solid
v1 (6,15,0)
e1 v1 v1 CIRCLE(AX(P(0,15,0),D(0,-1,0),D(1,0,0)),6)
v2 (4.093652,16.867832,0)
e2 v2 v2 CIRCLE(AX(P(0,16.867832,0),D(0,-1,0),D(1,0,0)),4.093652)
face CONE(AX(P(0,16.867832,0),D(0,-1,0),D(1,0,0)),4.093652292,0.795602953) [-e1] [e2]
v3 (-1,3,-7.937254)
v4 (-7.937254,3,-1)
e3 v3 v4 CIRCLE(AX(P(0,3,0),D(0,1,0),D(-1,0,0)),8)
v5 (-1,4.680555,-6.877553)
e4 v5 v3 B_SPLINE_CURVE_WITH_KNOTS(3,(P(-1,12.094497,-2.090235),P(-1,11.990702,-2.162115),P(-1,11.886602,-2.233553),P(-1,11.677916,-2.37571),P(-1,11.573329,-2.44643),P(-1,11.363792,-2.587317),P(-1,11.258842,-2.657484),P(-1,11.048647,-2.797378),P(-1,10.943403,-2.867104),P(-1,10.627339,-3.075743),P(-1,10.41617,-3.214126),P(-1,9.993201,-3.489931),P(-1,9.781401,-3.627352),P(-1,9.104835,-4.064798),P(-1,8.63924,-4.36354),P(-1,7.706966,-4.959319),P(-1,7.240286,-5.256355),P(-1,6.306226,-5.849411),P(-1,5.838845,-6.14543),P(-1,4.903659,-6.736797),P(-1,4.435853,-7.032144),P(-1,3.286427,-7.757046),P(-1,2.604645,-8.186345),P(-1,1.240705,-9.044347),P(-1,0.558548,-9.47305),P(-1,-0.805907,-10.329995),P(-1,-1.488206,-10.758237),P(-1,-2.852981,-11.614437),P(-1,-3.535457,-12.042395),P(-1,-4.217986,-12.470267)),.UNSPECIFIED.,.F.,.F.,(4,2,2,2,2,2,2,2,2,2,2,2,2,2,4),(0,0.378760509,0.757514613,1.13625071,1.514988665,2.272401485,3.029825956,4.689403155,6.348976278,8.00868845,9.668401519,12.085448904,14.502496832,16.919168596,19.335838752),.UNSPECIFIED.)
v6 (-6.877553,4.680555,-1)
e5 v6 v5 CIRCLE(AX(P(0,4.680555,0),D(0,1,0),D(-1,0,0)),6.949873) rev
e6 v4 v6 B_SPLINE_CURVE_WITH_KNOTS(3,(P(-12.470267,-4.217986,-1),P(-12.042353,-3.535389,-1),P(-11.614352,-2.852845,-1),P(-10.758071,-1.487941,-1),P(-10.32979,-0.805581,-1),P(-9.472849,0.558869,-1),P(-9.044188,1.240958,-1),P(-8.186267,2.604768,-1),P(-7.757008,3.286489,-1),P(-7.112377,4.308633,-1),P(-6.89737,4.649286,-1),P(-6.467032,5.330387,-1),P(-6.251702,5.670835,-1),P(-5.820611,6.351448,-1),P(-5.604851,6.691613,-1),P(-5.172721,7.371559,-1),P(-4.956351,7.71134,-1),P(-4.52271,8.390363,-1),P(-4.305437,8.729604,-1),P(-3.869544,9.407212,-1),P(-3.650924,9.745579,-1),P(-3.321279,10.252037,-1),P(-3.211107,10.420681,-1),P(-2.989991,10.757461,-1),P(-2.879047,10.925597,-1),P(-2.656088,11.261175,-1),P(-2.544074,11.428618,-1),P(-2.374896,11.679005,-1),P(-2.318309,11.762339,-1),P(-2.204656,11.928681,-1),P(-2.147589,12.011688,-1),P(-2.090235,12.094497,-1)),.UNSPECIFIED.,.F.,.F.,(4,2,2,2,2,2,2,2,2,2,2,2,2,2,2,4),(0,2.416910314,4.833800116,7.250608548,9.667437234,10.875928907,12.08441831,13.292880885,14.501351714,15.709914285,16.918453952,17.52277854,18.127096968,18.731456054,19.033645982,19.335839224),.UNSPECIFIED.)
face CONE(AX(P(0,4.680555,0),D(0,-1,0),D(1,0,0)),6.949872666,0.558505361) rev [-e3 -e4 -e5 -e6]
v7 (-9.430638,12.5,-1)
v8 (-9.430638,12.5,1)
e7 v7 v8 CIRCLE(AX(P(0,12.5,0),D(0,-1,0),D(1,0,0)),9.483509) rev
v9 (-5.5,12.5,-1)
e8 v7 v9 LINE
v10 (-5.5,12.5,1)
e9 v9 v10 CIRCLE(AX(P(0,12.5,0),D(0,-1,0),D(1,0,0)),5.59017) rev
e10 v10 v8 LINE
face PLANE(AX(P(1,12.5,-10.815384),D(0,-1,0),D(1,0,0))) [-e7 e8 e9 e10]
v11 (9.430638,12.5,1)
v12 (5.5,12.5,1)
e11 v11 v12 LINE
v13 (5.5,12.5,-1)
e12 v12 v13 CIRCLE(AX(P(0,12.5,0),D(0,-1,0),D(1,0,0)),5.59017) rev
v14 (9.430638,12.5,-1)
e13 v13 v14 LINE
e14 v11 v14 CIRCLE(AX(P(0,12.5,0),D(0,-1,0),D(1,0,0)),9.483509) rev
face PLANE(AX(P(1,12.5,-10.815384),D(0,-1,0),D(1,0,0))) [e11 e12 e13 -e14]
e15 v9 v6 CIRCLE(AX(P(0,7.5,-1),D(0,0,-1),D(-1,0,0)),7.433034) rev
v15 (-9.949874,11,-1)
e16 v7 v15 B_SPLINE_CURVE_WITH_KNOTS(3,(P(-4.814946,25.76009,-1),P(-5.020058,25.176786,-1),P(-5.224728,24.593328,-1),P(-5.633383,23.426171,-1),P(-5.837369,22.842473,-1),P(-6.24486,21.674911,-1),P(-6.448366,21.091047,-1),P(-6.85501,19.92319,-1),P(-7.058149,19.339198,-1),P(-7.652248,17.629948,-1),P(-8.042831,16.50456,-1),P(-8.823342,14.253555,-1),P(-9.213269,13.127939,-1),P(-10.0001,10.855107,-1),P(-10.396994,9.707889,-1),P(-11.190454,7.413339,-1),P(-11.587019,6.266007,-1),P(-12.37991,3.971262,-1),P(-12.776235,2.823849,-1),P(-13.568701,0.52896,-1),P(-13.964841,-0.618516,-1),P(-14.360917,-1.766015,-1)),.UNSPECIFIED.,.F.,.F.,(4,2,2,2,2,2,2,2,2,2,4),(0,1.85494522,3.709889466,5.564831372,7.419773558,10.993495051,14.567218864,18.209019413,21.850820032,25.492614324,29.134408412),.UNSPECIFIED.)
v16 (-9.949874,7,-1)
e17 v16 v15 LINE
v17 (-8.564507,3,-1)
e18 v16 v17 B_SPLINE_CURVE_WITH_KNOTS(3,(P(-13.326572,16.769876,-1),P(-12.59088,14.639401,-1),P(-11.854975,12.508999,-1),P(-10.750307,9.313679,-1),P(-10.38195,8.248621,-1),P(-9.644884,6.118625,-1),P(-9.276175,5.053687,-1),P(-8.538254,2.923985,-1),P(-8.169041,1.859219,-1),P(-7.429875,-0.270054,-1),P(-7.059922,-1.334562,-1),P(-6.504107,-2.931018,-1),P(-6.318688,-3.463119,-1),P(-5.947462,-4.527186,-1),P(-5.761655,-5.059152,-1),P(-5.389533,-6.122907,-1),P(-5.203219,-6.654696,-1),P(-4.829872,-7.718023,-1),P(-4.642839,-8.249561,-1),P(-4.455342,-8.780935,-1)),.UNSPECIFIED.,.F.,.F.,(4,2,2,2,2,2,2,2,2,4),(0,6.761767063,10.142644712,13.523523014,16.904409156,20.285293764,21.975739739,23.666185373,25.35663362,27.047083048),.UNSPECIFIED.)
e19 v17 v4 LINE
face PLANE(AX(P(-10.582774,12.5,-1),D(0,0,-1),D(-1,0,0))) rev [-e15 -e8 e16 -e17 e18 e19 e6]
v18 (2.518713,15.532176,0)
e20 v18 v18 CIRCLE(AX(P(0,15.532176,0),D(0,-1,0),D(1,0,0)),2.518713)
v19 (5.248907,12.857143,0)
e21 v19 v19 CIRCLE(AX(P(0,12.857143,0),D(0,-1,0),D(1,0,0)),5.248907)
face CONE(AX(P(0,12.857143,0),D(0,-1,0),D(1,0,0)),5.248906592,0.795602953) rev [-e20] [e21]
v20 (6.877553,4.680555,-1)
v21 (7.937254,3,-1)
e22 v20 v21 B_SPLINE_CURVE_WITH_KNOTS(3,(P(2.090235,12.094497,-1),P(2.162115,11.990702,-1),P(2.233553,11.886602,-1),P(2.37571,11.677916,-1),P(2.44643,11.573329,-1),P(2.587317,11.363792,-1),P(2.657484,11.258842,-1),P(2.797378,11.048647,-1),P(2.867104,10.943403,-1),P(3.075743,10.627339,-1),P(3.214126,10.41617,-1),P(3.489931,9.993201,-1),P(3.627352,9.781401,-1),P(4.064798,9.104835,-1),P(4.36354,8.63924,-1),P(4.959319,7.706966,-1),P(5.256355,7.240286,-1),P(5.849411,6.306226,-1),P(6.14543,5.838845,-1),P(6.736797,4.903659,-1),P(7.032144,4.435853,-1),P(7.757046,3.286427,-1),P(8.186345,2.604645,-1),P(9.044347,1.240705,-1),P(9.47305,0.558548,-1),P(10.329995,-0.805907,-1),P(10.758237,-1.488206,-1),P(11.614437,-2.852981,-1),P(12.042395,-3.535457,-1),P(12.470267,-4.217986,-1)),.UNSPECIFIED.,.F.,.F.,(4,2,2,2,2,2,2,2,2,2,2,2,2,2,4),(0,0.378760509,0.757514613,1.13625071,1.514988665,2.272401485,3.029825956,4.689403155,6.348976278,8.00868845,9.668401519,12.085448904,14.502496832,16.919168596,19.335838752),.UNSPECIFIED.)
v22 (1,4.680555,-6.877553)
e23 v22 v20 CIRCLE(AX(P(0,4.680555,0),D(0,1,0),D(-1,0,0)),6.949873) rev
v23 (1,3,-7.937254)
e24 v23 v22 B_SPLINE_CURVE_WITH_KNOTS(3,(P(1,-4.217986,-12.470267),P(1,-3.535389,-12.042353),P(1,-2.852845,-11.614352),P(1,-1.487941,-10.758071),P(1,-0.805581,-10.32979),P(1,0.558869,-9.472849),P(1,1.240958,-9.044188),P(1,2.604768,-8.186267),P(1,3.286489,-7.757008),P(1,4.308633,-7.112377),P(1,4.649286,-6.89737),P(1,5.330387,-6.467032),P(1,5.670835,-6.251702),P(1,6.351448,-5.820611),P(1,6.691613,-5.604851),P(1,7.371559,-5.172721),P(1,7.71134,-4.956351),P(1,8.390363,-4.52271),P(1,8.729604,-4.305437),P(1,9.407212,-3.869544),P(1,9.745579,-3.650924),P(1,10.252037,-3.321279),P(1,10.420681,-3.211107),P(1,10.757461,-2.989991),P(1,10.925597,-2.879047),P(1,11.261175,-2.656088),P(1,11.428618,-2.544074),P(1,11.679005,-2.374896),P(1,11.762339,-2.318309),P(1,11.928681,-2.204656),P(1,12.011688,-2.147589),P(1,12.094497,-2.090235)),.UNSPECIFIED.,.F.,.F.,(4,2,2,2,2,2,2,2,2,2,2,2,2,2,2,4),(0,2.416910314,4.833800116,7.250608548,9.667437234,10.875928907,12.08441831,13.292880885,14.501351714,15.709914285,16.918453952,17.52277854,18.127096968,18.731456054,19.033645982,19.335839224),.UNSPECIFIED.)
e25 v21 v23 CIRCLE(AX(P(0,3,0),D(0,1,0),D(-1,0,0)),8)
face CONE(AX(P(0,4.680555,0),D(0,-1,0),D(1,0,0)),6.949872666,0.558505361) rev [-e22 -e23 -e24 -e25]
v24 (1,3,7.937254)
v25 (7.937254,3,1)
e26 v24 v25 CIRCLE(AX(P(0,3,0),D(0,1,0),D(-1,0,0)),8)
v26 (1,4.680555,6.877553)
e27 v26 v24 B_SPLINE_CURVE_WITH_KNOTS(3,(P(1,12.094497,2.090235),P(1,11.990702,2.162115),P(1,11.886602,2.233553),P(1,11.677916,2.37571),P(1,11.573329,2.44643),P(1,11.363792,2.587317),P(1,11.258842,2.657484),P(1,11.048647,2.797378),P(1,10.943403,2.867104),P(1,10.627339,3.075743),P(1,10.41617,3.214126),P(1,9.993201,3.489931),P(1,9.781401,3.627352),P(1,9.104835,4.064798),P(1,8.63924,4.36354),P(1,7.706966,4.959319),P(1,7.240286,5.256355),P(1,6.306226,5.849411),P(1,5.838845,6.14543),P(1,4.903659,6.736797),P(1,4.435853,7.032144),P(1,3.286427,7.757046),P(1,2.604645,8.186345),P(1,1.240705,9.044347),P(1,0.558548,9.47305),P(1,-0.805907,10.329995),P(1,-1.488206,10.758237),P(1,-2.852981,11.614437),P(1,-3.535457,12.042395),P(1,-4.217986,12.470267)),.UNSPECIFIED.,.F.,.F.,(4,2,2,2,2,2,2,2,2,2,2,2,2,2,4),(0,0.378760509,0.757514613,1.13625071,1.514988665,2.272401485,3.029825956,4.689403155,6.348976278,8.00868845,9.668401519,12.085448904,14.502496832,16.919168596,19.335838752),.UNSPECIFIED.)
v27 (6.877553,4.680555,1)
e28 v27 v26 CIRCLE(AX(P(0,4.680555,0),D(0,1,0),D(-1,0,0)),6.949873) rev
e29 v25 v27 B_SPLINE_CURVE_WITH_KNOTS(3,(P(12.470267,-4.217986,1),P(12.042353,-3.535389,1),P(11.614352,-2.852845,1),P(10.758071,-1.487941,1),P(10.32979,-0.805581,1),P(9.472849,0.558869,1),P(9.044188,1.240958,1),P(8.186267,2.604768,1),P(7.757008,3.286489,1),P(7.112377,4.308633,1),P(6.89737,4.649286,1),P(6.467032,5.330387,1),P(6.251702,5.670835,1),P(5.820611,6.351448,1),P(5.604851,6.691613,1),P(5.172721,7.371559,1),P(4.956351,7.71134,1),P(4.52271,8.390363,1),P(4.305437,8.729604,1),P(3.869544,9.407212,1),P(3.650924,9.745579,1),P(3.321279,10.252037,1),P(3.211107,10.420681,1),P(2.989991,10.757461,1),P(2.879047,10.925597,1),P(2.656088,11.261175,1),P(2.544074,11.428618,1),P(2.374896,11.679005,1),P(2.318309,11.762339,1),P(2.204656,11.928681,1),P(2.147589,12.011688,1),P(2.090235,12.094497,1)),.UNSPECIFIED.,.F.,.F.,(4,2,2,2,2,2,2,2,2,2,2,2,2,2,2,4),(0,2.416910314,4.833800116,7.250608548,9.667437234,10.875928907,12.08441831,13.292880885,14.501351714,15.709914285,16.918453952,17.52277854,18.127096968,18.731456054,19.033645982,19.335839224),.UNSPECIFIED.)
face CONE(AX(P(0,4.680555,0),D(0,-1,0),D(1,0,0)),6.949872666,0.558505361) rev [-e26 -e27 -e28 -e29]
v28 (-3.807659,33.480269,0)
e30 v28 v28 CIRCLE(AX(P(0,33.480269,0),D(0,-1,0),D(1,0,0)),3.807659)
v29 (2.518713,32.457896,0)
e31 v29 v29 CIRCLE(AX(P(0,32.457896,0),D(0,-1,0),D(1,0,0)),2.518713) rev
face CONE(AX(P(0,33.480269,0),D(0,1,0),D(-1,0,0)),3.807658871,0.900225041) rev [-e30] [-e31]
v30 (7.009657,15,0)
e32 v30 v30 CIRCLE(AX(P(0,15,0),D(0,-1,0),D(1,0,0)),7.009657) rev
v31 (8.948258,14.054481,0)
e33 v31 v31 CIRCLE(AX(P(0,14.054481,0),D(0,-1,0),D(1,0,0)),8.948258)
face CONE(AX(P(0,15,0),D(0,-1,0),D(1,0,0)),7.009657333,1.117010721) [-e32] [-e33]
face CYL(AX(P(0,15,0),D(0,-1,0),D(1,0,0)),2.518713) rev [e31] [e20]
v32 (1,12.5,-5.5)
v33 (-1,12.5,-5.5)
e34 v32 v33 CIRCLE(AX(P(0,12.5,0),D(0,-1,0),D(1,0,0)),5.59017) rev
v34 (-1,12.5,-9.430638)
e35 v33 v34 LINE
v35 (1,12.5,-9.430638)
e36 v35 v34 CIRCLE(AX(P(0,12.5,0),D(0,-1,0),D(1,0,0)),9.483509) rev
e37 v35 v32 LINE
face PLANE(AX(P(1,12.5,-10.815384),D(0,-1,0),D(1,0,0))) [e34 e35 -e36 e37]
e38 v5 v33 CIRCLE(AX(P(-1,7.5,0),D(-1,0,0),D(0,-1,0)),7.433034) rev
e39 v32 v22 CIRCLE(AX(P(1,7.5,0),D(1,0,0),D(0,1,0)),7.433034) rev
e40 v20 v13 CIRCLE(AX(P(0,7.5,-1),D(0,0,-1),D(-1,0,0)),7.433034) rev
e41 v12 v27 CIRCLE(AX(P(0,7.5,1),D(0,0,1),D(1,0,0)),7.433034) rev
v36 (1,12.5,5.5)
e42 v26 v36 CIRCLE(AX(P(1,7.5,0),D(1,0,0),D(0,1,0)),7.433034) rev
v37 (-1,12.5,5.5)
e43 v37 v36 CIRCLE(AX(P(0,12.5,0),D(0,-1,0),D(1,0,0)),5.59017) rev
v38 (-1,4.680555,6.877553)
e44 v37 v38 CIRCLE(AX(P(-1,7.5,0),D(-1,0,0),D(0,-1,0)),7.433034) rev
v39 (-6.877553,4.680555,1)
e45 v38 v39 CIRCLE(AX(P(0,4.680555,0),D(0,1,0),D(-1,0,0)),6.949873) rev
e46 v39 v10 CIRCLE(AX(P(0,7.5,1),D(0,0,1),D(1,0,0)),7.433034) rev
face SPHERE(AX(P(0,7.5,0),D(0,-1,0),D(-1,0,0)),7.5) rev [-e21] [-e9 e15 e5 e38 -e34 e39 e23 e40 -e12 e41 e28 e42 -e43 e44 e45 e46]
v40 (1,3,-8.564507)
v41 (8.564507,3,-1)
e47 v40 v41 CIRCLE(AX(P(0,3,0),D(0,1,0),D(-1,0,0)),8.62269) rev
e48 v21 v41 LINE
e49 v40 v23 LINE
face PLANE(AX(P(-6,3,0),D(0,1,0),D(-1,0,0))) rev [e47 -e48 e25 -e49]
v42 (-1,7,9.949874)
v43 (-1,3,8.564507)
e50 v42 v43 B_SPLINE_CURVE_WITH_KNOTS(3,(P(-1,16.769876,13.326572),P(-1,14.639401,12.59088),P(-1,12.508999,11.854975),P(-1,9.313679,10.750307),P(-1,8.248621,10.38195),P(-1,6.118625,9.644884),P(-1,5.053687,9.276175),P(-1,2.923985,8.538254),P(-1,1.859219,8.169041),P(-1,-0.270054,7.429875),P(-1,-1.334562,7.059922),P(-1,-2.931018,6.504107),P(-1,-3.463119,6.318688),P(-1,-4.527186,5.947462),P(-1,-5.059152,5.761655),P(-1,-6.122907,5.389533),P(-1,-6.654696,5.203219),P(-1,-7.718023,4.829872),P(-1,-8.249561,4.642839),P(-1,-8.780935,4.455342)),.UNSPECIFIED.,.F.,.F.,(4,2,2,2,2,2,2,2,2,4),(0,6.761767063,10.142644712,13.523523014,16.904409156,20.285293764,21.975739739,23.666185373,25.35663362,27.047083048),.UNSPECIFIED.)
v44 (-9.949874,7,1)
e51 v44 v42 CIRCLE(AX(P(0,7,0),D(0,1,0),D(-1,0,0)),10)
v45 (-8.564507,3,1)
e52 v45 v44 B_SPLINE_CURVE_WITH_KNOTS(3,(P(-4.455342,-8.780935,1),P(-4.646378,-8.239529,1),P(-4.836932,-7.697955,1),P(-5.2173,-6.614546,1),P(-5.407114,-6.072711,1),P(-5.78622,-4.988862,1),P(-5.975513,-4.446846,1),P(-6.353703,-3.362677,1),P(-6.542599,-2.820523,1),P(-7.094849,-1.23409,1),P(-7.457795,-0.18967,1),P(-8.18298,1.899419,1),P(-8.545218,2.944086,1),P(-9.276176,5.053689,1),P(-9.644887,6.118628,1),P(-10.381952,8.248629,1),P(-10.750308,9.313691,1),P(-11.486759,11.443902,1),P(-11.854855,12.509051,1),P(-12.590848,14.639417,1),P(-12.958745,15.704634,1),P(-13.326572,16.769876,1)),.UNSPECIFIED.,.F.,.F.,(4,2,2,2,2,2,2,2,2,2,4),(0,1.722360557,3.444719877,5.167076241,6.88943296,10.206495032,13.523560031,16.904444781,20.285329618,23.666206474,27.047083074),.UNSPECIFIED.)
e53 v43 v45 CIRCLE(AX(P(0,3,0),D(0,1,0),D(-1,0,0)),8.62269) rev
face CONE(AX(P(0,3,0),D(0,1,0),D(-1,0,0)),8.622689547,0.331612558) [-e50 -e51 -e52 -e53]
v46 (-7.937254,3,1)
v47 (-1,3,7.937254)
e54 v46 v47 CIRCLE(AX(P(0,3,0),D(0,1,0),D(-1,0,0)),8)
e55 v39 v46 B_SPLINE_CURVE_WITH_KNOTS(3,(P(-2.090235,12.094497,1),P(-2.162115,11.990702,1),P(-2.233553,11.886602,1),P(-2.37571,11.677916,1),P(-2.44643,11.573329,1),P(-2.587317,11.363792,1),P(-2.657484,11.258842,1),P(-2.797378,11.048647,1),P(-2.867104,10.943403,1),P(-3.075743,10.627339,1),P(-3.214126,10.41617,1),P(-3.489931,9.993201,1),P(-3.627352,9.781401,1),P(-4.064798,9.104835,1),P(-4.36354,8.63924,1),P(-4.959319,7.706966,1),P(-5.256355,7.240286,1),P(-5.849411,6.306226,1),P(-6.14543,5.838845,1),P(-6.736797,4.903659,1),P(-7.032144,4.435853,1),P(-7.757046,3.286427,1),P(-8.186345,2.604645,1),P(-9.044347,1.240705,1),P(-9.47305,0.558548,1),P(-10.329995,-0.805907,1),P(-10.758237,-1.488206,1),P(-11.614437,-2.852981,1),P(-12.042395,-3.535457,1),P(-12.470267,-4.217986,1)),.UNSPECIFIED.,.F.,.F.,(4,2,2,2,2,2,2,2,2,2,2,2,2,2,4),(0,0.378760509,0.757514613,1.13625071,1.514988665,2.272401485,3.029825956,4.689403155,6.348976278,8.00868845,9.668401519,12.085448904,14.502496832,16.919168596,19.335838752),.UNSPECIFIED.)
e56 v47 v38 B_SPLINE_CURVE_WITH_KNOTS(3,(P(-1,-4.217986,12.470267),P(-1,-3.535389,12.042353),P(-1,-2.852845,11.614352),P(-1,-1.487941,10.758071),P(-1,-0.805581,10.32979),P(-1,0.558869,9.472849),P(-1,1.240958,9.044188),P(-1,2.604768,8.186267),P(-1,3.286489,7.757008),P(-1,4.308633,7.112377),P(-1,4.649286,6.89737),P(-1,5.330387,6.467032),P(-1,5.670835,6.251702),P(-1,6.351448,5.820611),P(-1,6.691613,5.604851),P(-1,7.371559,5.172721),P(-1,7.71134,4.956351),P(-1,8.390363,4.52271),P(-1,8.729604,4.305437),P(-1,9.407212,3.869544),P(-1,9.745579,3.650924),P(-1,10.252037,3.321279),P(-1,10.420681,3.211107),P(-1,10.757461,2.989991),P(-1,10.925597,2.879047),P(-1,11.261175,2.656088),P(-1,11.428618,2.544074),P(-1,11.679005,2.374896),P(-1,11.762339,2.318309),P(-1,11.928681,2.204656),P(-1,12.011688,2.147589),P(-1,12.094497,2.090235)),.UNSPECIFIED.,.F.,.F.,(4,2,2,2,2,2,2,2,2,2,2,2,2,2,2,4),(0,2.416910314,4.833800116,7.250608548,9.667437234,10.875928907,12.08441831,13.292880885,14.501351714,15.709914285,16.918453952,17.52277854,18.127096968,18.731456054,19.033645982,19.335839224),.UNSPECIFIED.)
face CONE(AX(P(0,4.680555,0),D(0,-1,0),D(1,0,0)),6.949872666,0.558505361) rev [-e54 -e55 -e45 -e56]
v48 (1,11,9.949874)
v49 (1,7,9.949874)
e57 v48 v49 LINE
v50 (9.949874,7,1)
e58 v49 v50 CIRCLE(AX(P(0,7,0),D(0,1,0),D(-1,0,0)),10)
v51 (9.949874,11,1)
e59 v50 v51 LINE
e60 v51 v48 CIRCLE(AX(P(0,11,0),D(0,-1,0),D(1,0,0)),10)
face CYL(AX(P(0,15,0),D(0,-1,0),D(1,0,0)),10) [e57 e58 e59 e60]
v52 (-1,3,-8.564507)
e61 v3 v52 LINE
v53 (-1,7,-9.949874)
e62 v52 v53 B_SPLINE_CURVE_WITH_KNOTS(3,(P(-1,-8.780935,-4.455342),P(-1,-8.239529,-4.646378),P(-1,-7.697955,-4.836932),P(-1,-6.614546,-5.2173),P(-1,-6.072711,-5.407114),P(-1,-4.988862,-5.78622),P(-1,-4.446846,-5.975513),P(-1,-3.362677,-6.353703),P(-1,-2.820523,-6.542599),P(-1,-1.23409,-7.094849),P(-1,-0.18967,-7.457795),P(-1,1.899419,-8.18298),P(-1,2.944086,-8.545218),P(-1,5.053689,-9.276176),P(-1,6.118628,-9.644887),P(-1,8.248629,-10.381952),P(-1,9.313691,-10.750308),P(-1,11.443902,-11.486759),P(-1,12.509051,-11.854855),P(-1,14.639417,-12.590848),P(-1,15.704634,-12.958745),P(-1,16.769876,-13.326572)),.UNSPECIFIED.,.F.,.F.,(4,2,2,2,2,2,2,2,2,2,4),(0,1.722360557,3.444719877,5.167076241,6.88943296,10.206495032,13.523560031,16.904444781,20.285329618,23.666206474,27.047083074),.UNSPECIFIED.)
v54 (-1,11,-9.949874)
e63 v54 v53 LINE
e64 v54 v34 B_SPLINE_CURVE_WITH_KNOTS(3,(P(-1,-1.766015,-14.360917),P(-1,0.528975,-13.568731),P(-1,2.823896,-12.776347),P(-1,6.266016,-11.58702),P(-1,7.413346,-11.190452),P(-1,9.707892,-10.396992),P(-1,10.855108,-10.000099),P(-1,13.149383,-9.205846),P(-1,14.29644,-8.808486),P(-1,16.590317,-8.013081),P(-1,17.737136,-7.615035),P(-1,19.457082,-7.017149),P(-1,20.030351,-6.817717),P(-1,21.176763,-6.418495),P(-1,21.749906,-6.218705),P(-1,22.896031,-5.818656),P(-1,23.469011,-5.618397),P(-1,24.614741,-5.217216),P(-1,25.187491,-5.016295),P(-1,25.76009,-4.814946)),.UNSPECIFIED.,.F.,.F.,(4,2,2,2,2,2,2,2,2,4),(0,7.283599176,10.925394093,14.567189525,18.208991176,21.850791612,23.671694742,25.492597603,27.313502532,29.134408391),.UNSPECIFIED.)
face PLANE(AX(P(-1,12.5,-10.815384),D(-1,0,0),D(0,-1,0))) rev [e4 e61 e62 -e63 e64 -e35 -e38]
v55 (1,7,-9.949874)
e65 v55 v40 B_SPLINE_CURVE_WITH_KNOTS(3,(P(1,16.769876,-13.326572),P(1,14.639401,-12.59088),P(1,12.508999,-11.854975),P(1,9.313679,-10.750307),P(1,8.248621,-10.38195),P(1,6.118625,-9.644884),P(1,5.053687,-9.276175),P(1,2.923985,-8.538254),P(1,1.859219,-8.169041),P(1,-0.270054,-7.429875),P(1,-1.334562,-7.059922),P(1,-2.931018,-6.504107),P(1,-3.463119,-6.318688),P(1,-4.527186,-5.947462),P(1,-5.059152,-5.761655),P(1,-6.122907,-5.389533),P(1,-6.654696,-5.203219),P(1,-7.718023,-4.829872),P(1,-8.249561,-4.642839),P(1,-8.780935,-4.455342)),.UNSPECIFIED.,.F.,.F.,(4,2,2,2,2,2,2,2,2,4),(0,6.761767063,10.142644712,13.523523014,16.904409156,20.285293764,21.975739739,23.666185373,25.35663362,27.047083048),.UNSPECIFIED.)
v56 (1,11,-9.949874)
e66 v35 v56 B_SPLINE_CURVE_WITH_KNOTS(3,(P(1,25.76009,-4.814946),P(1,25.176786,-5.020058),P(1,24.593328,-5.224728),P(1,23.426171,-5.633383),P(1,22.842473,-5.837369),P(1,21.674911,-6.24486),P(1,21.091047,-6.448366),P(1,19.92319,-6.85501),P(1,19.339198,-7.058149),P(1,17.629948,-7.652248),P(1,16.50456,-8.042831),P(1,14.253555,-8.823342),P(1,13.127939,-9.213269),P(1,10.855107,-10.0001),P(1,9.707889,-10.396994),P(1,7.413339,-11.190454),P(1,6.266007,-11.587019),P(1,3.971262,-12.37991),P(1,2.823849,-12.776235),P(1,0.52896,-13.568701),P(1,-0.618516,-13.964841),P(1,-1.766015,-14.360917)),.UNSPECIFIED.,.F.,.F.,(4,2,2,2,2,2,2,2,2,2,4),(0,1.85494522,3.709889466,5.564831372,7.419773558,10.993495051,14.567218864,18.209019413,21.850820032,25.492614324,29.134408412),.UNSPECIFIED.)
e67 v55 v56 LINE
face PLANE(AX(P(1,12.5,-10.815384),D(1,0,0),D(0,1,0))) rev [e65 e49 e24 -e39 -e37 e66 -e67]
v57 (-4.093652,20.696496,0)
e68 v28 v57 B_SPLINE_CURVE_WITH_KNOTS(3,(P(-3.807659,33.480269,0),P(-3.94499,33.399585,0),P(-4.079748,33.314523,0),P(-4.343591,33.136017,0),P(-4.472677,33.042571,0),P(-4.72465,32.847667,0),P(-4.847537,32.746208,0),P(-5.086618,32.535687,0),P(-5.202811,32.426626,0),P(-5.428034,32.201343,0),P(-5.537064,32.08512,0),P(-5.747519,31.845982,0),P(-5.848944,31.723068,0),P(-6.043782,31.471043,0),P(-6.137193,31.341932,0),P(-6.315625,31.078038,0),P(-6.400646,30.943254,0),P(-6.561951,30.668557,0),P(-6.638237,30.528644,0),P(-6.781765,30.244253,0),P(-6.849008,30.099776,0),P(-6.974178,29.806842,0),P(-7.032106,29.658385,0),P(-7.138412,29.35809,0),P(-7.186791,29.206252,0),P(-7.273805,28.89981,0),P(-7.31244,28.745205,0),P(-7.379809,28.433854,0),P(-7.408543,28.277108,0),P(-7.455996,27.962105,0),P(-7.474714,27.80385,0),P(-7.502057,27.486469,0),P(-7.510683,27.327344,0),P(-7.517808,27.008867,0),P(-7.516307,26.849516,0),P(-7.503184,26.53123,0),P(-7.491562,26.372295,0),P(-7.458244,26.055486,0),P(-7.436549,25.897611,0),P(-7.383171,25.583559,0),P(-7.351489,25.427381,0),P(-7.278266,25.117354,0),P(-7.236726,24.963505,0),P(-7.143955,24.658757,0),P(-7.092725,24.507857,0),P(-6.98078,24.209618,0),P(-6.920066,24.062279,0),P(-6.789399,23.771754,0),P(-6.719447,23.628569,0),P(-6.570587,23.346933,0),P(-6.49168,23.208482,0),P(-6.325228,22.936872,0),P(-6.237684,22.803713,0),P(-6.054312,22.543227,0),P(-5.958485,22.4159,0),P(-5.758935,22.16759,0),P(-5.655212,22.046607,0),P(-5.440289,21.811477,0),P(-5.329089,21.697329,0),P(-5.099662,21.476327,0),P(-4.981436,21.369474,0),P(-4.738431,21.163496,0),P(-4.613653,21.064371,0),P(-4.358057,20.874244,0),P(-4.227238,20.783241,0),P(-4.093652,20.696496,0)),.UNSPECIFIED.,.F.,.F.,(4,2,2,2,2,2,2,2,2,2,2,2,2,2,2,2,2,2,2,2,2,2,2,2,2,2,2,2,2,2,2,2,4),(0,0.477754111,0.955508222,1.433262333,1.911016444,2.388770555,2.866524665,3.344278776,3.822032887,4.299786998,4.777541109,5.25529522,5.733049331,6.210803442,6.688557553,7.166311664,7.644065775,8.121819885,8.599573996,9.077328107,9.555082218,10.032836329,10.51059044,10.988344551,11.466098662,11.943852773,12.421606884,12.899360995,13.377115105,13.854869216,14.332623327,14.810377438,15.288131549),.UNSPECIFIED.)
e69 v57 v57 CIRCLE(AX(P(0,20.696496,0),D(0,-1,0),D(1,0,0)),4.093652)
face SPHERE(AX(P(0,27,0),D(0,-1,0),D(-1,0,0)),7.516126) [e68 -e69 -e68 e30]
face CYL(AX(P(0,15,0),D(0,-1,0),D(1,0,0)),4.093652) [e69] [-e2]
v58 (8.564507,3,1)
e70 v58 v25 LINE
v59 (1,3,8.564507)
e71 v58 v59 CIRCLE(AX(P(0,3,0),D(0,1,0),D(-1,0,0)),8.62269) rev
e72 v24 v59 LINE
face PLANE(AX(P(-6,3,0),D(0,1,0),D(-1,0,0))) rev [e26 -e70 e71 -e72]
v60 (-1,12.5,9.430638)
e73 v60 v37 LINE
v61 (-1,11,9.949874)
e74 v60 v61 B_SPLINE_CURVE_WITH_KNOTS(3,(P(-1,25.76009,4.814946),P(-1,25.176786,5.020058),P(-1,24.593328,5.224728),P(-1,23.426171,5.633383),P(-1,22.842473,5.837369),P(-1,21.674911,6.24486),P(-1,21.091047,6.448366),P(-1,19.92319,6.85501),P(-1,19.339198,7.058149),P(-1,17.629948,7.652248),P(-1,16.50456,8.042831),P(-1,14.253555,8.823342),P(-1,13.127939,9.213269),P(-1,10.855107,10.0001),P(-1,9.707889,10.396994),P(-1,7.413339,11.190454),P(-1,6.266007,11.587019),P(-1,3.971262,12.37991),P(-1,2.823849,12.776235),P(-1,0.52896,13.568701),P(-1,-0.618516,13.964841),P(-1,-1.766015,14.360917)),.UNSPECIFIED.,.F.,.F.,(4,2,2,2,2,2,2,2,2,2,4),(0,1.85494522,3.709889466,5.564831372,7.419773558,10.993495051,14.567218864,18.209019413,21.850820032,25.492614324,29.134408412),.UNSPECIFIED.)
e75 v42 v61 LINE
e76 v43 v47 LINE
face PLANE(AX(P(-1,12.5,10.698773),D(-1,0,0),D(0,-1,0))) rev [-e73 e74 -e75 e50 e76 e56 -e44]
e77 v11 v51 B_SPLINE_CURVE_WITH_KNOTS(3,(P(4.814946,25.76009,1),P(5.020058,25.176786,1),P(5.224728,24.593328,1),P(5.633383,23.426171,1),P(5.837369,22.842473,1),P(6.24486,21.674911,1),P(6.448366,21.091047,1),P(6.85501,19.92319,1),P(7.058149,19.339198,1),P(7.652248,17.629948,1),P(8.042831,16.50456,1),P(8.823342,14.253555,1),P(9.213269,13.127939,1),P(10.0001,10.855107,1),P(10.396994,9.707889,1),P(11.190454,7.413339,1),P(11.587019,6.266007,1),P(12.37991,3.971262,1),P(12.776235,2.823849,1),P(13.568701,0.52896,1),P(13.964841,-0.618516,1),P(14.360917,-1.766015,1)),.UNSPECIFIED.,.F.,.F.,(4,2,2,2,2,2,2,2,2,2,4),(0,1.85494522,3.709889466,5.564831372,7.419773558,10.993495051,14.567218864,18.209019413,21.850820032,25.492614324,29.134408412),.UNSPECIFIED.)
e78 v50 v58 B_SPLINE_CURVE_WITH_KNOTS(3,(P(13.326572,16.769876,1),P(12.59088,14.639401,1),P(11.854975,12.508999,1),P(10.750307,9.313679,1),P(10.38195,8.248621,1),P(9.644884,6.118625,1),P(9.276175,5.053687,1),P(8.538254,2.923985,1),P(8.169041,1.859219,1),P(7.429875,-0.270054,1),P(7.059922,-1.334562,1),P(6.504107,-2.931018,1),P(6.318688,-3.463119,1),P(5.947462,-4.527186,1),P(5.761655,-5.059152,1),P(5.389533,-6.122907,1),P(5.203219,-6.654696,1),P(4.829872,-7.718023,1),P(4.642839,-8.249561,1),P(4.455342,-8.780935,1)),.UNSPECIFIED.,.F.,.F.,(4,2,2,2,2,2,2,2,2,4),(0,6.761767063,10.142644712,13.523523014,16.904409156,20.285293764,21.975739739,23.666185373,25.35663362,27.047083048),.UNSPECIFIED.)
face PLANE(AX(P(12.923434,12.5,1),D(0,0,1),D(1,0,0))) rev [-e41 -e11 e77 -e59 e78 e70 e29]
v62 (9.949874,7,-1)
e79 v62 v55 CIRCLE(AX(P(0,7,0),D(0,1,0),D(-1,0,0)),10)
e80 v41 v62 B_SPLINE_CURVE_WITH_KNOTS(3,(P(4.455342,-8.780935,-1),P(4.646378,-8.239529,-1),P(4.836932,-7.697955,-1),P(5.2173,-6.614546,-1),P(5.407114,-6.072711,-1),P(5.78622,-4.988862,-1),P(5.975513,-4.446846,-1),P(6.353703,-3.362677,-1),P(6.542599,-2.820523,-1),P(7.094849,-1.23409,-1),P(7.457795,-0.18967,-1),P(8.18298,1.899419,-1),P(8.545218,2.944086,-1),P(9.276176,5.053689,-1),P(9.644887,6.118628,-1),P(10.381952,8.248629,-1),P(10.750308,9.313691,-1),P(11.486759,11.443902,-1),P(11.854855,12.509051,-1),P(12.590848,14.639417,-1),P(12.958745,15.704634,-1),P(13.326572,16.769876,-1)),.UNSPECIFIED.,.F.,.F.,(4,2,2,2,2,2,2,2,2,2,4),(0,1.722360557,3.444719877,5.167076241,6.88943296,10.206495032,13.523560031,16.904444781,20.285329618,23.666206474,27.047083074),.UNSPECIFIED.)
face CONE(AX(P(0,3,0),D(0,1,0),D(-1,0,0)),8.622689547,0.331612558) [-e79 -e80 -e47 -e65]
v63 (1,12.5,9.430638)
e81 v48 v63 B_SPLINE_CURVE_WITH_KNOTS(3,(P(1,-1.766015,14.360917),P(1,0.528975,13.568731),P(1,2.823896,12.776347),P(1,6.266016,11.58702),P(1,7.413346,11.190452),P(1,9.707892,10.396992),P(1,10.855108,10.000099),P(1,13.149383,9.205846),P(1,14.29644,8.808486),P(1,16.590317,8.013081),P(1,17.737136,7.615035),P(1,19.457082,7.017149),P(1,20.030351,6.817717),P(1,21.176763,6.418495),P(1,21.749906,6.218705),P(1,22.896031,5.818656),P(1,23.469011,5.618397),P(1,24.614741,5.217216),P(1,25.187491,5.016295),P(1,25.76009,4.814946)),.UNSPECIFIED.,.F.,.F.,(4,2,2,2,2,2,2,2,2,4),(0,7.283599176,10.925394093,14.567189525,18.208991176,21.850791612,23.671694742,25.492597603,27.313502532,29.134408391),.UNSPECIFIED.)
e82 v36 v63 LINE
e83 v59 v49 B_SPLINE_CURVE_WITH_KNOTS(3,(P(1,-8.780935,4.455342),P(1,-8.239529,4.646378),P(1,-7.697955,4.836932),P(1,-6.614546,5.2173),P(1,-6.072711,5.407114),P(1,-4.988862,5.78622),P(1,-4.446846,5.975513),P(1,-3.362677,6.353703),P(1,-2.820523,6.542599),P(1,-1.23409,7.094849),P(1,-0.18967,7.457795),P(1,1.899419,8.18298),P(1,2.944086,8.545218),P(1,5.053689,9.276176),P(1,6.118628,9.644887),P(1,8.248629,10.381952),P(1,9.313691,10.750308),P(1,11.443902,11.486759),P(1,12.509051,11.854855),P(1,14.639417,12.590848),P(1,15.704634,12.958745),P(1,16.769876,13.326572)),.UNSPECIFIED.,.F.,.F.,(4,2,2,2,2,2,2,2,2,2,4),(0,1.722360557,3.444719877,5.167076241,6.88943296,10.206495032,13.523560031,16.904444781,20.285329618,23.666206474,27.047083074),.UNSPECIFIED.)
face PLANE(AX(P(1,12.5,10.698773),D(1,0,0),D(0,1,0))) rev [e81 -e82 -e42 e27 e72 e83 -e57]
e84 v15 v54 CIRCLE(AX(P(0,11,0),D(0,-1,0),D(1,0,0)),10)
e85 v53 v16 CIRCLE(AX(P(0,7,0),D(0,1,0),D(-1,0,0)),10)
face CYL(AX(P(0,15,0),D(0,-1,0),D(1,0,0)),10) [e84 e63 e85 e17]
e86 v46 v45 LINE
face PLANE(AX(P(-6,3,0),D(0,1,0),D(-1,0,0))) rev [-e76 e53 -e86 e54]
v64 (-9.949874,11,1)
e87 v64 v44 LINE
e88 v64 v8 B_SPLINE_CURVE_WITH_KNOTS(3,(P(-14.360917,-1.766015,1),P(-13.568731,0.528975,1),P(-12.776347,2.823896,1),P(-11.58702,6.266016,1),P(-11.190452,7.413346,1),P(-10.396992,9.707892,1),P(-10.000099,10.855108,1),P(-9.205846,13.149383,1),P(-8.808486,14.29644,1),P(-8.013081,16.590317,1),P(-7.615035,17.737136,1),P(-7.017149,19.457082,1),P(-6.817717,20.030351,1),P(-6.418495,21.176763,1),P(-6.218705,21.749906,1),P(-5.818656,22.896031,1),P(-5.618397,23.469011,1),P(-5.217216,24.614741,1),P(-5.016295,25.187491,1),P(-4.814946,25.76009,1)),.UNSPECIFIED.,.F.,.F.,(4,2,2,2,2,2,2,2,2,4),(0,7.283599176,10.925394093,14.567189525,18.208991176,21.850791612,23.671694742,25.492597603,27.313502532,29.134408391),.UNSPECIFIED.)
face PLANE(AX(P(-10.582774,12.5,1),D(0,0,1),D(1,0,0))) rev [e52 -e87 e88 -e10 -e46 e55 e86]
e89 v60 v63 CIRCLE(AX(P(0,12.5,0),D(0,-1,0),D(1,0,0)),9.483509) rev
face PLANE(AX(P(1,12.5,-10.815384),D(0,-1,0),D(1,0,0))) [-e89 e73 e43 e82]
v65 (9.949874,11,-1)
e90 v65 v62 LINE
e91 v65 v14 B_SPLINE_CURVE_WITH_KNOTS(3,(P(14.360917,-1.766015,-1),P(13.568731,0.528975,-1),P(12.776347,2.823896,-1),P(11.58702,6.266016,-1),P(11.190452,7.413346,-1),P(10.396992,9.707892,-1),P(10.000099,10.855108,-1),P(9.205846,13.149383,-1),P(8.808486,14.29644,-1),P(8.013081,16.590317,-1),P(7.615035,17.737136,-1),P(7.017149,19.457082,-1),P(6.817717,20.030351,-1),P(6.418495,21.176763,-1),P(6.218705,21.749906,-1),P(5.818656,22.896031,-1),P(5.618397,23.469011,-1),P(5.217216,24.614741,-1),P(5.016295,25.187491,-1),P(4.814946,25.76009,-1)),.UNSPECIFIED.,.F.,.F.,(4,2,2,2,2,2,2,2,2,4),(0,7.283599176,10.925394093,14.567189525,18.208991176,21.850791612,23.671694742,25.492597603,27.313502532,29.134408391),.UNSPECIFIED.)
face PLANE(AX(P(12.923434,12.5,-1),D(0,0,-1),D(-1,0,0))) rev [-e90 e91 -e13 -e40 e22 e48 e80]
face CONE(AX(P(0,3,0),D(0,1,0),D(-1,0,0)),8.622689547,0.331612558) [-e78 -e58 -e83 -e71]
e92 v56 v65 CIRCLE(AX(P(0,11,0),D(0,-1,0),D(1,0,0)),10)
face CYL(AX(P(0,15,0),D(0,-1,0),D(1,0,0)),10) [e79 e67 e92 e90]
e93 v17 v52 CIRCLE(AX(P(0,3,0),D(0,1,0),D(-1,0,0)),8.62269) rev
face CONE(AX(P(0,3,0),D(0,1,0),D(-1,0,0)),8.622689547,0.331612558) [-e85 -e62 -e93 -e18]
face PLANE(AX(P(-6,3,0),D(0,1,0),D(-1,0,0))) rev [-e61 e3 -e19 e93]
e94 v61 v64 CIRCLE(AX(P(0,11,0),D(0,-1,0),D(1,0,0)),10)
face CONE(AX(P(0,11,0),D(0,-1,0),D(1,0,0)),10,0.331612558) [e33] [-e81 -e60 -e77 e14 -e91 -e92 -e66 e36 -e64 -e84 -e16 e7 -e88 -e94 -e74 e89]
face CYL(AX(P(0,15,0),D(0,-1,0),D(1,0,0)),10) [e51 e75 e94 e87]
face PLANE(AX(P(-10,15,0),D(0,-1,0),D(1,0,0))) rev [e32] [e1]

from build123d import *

# Parameters (mm, degrees)
FASE1_SIZE                      = 2
FASE2_SIZE                      = 4
FASE2_SIZE2                     = 1.377310453
FASE3_SIZE                      = 4
FASE3_SIZE2                     = 1.377310453
SCHNITT_LINEAR_AUSTRAGEN1_DEPTH = 9.5
FASE4_SIZE                      = 1
FASE4_SIZE2                     = 1.613032213
FASE5_SIZE                      = 1.623645291


with BuildPart() as part:
    # Skizze1 → Rotation1 (revolve)
    with BuildSketch(Plane.XY, mode=Mode.PRIVATE) as rotation1_sk:
        with BuildLine():
            Line((-2.51871264, 34.081541744), (-2.51871264, 15.53217569))
            Line((-2.51871264, 15.53217569), (-5.248906592, 12.857142857))
            ThreePointArc((-5.248906592, 12.857142857), (-7.478321416, 8.069832253), (-6, 3))
            Line((-6, 3), (-10, 3))
            Line((-10, 3), (-10, 15))
            Line((-10, 15), (-6, 15))
            Line((-6, 15), (-4.093652292, 16.867831662))
            Line((-4.093652292, 16.867831662), (-4.093652292, 20.696496392))
            ThreePointArc((-4.093652292, 20.696496392), (-7.464630082, 27.878319169), (-2.51871264, 34.081541744))
        make_face()
    revolve(rotation1_sk.sketch.rotate(Axis((0, 15, 0), (0, 1, 0)), 180), axis=Axis((0, 15, 0), (0, 1, 0)))

    # Fase1
    # the kernel refuses this chamfer: 2, 1.818354592 mm, written as the material it takes off along each edge
    with BuildSketch(Plane(origin=(0, 3, 0), x_dir=(1, 0, 0), z_dir=(0, 0, 1))) as fase1_piece_1:
        with BuildLine():
            Line((6.949872666, 1.680555032), (6 + FASE1_SIZE, 0))
            Line((6 + FASE1_SIZE, 0), (6, 0))
            ThreePointArc((6, 0), (6.538732617, 0.826449161), (6.949872666, 1.680555032))
        make_face()
    revolve(axis=Axis((0, 3, 0), (0, 1, 0)), mode=Mode.SUBTRACT)

    # Fase2
    fase2_edges = [part.edges().sort_by_distance(p)[0] for p in [
        (-10, 3, 0),
    ]]
    fase2_side = [part.faces().sort_by_distance(p)[0] for p in [
        (-10, 9, 0),
    ]]
    chamfer(fase2_edges, length=FASE2_SIZE, length2=FASE2_SIZE2, reference=fase2_side[0])

    # Fase3
    fase3_edges = [part.edges().sort_by_distance(p)[0] for p in [
        (-10, 15, 0),
    ]]
    fase3_side = [part.faces().sort_by_distance(p)[0] for p in [
        (-10, 11, 0),
    ]]
    chamfer(fase3_edges, length=FASE3_SIZE, length2=FASE3_SIZE2, reference=fase3_side[0])

    # Skizze2 → Schnitt-Linear austragen1 (cut)
    with BuildSketch(Plane.XZ.offset(-3)):
        Polygon((0, 10.698773164), (1, 10.698773164), (1, 1), (12.923434457, 1), (12.923434457, 0), (12.923434457, -1), (1, -1), (1, -10.815383619), (0, -10.815383619), (-1, -10.815383619), (-1, -1), (-10.582773881, -1), (-10.582773881, 0), (-10.582773881, 1), (-1, 1), (-1, 10.698773164), align=None)
    extrude(amount=-SCHNITT_LINEAR_AUSTRAGEN1_DEPTH, mode=Mode.SUBTRACT)

    # Fase4
    fase4_edges = [part.edges().sort_by_distance(p)[0] for p in [
        (-8.622689547, 15, 0),
    ]]
    fase4_side = [part.faces().sort_by_distance(p)[0] for p in [
        (-9.311344773, 13, 0),
    ]]
    chamfer(fase4_edges, length=FASE4_SIZE, length2=FASE4_SIZE2, reference=fase4_side[0])

    # Fase5
    # the kernel refuses this chamfer: 1.623645291, 1.5 mm, written as the material it takes off along each edge
    with BuildSketch(Plane(origin=(0, 34.081541744, 0), x_dir=(1, 0, 0), z_dir=(0, 0, 1))) as fase5_piece_1:
        with BuildLine():
            Line((2.51871264, -FASE5_SIZE), (3.807658871, -0.601273173))
            ThreePointArc((3.807658871, -0.601273173), (3.190605907, -0.276236403), (2.51871264, 0))
            Line((2.51871264, 0), (2.51871264, -FASE5_SIZE))
        make_face()
    revolve(axis=Axis((0, 34.081541744, 0), (0, 1, 0)), mode=Mode.SUBTRACT)


solid = part.part
